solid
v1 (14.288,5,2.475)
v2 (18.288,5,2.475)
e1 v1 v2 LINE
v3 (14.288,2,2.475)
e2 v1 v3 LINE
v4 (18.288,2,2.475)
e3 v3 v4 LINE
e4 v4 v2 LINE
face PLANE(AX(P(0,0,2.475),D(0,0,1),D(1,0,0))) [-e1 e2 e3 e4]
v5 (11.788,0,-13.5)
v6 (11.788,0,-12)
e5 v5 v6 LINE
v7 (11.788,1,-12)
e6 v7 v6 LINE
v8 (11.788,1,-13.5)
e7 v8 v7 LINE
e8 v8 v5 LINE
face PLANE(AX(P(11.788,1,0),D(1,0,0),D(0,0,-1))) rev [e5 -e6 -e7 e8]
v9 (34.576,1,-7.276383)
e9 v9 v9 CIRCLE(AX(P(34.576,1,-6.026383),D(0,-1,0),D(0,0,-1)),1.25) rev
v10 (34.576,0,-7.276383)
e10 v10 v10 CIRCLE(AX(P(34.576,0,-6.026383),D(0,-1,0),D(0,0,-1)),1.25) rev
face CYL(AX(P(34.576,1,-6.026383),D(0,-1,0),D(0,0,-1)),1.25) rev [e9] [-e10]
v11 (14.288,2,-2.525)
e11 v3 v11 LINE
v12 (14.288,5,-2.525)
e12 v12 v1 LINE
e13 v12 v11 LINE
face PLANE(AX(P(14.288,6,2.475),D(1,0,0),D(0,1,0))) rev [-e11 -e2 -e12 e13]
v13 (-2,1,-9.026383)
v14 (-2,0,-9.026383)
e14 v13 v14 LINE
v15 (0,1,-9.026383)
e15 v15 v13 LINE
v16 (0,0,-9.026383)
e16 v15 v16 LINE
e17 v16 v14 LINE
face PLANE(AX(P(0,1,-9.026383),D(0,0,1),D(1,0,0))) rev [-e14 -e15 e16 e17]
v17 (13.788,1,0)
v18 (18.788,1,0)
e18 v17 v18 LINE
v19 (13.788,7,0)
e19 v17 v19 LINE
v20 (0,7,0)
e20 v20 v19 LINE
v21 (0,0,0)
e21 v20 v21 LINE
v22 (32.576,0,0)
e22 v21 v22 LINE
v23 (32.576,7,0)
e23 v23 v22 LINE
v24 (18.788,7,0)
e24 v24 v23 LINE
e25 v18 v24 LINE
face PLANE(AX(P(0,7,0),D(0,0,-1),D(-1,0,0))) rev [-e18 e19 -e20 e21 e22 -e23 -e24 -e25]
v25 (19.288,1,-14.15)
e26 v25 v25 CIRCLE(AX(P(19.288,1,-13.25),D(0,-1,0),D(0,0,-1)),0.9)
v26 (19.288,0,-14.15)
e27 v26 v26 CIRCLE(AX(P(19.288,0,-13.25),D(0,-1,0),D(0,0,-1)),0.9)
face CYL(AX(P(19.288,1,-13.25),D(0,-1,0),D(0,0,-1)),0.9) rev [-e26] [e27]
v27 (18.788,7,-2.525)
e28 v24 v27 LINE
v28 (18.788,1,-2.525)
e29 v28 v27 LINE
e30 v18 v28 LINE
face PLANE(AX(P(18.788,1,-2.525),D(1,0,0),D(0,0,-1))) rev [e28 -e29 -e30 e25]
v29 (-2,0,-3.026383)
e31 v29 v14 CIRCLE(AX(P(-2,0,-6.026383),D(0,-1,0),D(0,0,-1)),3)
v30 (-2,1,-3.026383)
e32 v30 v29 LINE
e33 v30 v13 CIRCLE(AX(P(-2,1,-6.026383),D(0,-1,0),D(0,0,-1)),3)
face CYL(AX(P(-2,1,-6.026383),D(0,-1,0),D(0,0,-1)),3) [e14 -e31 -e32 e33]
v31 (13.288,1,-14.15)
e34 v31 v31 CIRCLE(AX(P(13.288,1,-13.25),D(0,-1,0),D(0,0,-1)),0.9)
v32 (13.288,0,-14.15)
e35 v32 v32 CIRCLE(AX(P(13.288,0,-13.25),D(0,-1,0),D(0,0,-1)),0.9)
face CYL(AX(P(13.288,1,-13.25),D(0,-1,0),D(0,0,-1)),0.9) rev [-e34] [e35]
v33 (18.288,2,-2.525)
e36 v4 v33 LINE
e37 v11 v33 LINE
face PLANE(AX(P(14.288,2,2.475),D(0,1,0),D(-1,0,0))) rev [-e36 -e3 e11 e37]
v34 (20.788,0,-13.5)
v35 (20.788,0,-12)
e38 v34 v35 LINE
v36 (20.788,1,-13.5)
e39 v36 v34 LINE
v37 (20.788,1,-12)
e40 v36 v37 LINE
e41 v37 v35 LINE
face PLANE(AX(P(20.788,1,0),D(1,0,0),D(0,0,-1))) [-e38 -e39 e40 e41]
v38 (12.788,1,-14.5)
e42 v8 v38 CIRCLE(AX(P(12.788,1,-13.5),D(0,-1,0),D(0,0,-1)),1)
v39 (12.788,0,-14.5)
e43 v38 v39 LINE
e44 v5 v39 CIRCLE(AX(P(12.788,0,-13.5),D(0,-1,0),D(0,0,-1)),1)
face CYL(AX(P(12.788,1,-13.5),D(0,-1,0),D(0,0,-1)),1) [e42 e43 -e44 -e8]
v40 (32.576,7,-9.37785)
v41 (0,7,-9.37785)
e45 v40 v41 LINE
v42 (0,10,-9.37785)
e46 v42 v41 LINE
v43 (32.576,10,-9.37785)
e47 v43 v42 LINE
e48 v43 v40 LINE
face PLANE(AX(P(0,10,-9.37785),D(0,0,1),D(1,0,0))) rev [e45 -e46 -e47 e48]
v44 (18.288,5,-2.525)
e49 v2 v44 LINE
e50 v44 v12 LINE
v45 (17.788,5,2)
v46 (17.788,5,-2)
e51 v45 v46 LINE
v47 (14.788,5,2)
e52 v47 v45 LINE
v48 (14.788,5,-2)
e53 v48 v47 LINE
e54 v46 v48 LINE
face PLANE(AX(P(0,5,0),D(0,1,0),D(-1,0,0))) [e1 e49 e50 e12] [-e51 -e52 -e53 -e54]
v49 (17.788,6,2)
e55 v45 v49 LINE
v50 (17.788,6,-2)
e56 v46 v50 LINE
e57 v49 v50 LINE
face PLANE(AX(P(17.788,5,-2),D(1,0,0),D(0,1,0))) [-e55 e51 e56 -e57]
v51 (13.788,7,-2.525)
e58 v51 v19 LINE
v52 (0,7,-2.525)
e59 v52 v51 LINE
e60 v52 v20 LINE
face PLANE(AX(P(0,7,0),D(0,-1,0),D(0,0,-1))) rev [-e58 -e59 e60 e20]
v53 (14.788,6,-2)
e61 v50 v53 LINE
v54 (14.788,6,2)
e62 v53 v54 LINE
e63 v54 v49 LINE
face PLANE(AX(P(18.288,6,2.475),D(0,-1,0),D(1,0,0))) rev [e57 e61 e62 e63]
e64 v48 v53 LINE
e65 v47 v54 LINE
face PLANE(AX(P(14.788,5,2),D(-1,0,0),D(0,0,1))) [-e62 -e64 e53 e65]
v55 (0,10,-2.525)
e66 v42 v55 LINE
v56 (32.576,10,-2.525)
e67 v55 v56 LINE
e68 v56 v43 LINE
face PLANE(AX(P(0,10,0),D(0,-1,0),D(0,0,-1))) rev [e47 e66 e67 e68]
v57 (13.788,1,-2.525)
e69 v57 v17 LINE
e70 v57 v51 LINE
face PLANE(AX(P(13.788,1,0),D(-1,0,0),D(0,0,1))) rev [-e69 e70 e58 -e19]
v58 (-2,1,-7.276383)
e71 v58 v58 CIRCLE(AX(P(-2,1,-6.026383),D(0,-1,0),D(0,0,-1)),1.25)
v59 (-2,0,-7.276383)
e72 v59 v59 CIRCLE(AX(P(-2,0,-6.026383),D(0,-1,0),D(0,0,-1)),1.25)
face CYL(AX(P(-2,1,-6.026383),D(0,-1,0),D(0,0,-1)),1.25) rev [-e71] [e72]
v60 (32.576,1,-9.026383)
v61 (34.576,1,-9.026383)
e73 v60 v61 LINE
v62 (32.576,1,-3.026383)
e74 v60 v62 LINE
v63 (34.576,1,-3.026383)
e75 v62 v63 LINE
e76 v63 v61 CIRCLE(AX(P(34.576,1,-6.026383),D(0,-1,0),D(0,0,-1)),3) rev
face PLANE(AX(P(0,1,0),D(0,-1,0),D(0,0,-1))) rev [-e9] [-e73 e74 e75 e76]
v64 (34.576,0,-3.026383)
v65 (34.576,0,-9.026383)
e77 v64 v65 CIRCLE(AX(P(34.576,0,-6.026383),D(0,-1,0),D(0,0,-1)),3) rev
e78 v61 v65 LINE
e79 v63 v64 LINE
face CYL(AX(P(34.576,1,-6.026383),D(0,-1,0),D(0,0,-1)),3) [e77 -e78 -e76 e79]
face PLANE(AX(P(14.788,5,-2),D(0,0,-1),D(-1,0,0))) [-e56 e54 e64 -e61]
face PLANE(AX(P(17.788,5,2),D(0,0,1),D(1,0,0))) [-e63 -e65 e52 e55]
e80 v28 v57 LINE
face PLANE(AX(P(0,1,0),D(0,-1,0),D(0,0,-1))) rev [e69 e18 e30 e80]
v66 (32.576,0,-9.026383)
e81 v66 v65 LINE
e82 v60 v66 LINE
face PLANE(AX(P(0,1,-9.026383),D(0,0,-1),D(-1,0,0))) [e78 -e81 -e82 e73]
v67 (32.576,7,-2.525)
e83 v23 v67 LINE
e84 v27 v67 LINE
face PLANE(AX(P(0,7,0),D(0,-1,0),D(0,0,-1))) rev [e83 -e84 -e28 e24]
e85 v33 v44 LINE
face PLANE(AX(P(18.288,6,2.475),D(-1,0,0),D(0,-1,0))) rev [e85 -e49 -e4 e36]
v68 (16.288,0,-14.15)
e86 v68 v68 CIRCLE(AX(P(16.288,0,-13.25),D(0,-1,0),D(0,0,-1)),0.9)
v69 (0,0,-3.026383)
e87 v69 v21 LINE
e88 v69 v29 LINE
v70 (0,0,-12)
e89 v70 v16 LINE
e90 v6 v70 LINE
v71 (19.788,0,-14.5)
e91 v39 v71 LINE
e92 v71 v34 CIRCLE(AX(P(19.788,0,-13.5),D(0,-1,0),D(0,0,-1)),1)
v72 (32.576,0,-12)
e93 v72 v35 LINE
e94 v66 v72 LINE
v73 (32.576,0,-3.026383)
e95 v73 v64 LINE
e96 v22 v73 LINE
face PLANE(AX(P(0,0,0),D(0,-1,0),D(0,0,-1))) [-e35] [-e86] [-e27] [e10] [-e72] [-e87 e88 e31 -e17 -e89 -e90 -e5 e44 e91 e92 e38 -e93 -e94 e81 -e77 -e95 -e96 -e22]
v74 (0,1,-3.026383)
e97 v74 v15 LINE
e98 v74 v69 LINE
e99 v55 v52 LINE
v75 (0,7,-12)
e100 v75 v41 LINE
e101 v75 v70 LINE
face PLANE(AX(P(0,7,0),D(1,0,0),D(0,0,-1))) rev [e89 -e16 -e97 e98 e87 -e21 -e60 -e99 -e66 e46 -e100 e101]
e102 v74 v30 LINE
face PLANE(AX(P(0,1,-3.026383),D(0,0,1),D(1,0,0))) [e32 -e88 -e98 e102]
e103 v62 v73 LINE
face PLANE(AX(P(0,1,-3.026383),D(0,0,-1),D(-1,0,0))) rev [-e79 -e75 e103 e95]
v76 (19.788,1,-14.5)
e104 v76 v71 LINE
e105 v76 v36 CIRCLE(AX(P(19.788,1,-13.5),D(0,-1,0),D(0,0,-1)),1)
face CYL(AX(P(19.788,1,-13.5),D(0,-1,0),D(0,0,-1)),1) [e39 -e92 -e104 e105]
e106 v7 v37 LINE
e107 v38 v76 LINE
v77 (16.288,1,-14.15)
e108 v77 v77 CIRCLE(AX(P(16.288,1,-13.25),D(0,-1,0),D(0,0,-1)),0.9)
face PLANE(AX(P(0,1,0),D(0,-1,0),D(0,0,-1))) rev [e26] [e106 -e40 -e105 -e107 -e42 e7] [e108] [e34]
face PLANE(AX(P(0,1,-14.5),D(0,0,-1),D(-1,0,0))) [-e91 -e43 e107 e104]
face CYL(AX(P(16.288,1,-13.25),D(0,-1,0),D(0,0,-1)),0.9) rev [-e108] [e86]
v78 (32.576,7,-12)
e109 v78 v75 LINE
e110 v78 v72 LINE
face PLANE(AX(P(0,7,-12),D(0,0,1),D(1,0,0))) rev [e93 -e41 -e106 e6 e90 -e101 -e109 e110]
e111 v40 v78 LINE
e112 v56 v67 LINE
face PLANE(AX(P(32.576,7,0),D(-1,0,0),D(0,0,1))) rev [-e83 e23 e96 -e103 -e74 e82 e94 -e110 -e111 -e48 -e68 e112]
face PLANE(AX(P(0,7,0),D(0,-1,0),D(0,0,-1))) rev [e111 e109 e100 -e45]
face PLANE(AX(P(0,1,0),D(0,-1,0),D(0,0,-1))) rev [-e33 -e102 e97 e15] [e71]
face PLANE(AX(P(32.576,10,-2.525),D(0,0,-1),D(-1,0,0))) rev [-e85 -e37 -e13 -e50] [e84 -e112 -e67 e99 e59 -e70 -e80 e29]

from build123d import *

# Parameters (mm, degrees)
SKETCH1_W               = 32.576000126
SKETCH1_H               = 12
BOSS_EXTRUDE1_DEPTH     = 7
SKETCH2_W               = 32.576000126
SKETCH2_H               = 6.852850135
BOSS_EXTRUDE2_DEPTH     = 3
SKETCH3_R               = 0.9
BOSS_EXTRUDE3_DEPTH     = 1
BOSS_EXTRUDE5_START     = -1
BOSS_EXTRUDE5_OUTLINE_R = 1.25
BOSS_EXTRUDE5_DEPTH     = 1
SKETCH5_W               = 5
SKETCH5_H               = 2.525
CUT_EXTRUDE2_DEPTH      = 6
SKETCH6_W               = 4
SKETCH6_H               = 4
BOSS_EXTRUDE6_DEPTH     = 5
SKETCH7_W               = 4
SKETCH7_H               = 5
SKETCH7_W_2             = 3
SKETCH7_H_2             = 4
CUT_EXTRUDE4_DEPTH      = 1


# Read off the part's stored shape, not the designer's step: Boss-Extrude5
with BuildPart() as part:
    # Sketch1 → Boss-Extrude1 (new body)
    with BuildSketch(Plane(origin=(0, 0, 0), x_dir=(1, 0, 0), z_dir=(0, 1, 0))):
        with Locations((16.288000063, 6)):
            Rectangle(SKETCH1_W, SKETCH1_H)
    extrude(amount=BOSS_EXTRUDE1_DEPTH)

    # Sketch2 → Boss-Extrude2 (add)
    with BuildSketch(Plane(origin=(0, 7, 0), x_dir=(1, 0, 0), z_dir=(0, 1, 0))):
        with Locations((16.288000063, 5.951425068)):
            Rectangle(SKETCH2_W, SKETCH2_H)
    extrude(amount=BOSS_EXTRUDE2_DEPTH)

    # Sketch3 → Boss-Extrude3 (add)
    with BuildSketch(Plane.XZ):
        with BuildLine():
            ThreePointArc((19.788000063, -14.5), (20.495106844, -14.207106781), (20.788000063, -13.5))
            Line((20.788000063, -13.5), (20.788000063, -12))
            Line((20.788000063, -12), (11.788000063, -12))
            Line((11.788000063, -12), (11.788000063, -13.5))
            ThreePointArc((11.788000063, -13.5), (12.080893282, -14.207106781), (12.788000063, -14.5))
            Line((12.788000063, -14.5), (19.788000063, -14.5))
        make_face()
        with Locations(Location((13.288000063, -13.25, 0), (0, 0, 270))):
            Circle(SKETCH3_R, mode=Mode.SUBTRACT)
        with Locations(Location((16.288000063, -13.25, 0), (0, 0, 270))):
            Circle(SKETCH3_R, mode=Mode.SUBTRACT)
        with Locations(Location((19.288000063, -13.25, 0), (0, 0, 270))):
            Circle(SKETCH3_R, mode=Mode.SUBTRACT)
    extrude(amount=-BOSS_EXTRUDE3_DEPTH)

    # Boss-Extrude5 outline → Boss-Extrude5 (add)
    # profile 1 of 2: a face of its own
    with BuildSketch(Plane.XZ.offset(BOSS_EXTRUDE5_START)):
        with BuildLine():
            Line((32.576000126, -9.026382535), (34.576, -9.026382535))
            ThreePointArc((34.576, -9.026382535), (37.576, -6.026382535), (34.576, -3.026382535))
            Line((34.576, -3.026382535), (32.576000126, -3.026382535))
            Line((32.576000126, -3.026382535), (32.576000126, -9.026382535))
        make_face()
        with Locations((34.576, -6.026382535)):
            Circle(BOSS_EXTRUDE5_OUTLINE_R, mode=Mode.SUBTRACT)
    # profile 2 of 2: a face of its own
    with BuildSketch(Plane.XZ.offset(BOSS_EXTRUDE5_START)):
        with BuildLine():
            Line((-2, -9.026382535), (0, -9.026382535))
            Line((0, -9.026382535), (0, -3.026382535))
            Line((0, -3.026382535), (-2, -3.026382535))
            ThreePointArc((-2, -3.026382535), (-5, -6.026382535), (-2, -9.026382535))
        make_face()
        with Locations((-2, -6.026382535)):
            Circle(BOSS_EXTRUDE5_OUTLINE_R, mode=Mode.SUBTRACT)
    extrude(amount=BOSS_EXTRUDE5_DEPTH)

    # Sketch5 → Cut-Extrude2 (cut)
    with BuildSketch(Plane(origin=(0, 7, 0), x_dir=(1, 0, 0), z_dir=(0, 1, 0))):
        with Locations((16.288000063, 1.2625)):
            Rectangle(SKETCH5_W, SKETCH5_H)
    extrude(amount=-CUT_EXTRUDE2_DEPTH, mode=Mode.SUBTRACT)

    # Sketch6 → Boss-Extrude6 (add)
    with BuildSketch(Plane.XY.offset(-2.525)):
        with Locations((16.288000063, 4)):
            Rectangle(SKETCH6_W, SKETCH6_H)
    extrude(amount=BOSS_EXTRUDE6_DEPTH)

    # Sketch7 → Cut-Extrude4 (cut)
    with BuildSketch(Plane(origin=(0, 6, 0), x_dir=(1, 0, 0), z_dir=(0, 1, 0))):
        with Locations((16.288000063, 0.025)):
            Rectangle(SKETCH7_W, SKETCH7_H)
        with Locations((16.288000063, 0)):
            Rectangle(SKETCH7_W_2, SKETCH7_H_2, mode=Mode.SUBTRACT)
    extrude(amount=-CUT_EXTRUDE4_DEPTH, mode=Mode.SUBTRACT)


solid = part.part
